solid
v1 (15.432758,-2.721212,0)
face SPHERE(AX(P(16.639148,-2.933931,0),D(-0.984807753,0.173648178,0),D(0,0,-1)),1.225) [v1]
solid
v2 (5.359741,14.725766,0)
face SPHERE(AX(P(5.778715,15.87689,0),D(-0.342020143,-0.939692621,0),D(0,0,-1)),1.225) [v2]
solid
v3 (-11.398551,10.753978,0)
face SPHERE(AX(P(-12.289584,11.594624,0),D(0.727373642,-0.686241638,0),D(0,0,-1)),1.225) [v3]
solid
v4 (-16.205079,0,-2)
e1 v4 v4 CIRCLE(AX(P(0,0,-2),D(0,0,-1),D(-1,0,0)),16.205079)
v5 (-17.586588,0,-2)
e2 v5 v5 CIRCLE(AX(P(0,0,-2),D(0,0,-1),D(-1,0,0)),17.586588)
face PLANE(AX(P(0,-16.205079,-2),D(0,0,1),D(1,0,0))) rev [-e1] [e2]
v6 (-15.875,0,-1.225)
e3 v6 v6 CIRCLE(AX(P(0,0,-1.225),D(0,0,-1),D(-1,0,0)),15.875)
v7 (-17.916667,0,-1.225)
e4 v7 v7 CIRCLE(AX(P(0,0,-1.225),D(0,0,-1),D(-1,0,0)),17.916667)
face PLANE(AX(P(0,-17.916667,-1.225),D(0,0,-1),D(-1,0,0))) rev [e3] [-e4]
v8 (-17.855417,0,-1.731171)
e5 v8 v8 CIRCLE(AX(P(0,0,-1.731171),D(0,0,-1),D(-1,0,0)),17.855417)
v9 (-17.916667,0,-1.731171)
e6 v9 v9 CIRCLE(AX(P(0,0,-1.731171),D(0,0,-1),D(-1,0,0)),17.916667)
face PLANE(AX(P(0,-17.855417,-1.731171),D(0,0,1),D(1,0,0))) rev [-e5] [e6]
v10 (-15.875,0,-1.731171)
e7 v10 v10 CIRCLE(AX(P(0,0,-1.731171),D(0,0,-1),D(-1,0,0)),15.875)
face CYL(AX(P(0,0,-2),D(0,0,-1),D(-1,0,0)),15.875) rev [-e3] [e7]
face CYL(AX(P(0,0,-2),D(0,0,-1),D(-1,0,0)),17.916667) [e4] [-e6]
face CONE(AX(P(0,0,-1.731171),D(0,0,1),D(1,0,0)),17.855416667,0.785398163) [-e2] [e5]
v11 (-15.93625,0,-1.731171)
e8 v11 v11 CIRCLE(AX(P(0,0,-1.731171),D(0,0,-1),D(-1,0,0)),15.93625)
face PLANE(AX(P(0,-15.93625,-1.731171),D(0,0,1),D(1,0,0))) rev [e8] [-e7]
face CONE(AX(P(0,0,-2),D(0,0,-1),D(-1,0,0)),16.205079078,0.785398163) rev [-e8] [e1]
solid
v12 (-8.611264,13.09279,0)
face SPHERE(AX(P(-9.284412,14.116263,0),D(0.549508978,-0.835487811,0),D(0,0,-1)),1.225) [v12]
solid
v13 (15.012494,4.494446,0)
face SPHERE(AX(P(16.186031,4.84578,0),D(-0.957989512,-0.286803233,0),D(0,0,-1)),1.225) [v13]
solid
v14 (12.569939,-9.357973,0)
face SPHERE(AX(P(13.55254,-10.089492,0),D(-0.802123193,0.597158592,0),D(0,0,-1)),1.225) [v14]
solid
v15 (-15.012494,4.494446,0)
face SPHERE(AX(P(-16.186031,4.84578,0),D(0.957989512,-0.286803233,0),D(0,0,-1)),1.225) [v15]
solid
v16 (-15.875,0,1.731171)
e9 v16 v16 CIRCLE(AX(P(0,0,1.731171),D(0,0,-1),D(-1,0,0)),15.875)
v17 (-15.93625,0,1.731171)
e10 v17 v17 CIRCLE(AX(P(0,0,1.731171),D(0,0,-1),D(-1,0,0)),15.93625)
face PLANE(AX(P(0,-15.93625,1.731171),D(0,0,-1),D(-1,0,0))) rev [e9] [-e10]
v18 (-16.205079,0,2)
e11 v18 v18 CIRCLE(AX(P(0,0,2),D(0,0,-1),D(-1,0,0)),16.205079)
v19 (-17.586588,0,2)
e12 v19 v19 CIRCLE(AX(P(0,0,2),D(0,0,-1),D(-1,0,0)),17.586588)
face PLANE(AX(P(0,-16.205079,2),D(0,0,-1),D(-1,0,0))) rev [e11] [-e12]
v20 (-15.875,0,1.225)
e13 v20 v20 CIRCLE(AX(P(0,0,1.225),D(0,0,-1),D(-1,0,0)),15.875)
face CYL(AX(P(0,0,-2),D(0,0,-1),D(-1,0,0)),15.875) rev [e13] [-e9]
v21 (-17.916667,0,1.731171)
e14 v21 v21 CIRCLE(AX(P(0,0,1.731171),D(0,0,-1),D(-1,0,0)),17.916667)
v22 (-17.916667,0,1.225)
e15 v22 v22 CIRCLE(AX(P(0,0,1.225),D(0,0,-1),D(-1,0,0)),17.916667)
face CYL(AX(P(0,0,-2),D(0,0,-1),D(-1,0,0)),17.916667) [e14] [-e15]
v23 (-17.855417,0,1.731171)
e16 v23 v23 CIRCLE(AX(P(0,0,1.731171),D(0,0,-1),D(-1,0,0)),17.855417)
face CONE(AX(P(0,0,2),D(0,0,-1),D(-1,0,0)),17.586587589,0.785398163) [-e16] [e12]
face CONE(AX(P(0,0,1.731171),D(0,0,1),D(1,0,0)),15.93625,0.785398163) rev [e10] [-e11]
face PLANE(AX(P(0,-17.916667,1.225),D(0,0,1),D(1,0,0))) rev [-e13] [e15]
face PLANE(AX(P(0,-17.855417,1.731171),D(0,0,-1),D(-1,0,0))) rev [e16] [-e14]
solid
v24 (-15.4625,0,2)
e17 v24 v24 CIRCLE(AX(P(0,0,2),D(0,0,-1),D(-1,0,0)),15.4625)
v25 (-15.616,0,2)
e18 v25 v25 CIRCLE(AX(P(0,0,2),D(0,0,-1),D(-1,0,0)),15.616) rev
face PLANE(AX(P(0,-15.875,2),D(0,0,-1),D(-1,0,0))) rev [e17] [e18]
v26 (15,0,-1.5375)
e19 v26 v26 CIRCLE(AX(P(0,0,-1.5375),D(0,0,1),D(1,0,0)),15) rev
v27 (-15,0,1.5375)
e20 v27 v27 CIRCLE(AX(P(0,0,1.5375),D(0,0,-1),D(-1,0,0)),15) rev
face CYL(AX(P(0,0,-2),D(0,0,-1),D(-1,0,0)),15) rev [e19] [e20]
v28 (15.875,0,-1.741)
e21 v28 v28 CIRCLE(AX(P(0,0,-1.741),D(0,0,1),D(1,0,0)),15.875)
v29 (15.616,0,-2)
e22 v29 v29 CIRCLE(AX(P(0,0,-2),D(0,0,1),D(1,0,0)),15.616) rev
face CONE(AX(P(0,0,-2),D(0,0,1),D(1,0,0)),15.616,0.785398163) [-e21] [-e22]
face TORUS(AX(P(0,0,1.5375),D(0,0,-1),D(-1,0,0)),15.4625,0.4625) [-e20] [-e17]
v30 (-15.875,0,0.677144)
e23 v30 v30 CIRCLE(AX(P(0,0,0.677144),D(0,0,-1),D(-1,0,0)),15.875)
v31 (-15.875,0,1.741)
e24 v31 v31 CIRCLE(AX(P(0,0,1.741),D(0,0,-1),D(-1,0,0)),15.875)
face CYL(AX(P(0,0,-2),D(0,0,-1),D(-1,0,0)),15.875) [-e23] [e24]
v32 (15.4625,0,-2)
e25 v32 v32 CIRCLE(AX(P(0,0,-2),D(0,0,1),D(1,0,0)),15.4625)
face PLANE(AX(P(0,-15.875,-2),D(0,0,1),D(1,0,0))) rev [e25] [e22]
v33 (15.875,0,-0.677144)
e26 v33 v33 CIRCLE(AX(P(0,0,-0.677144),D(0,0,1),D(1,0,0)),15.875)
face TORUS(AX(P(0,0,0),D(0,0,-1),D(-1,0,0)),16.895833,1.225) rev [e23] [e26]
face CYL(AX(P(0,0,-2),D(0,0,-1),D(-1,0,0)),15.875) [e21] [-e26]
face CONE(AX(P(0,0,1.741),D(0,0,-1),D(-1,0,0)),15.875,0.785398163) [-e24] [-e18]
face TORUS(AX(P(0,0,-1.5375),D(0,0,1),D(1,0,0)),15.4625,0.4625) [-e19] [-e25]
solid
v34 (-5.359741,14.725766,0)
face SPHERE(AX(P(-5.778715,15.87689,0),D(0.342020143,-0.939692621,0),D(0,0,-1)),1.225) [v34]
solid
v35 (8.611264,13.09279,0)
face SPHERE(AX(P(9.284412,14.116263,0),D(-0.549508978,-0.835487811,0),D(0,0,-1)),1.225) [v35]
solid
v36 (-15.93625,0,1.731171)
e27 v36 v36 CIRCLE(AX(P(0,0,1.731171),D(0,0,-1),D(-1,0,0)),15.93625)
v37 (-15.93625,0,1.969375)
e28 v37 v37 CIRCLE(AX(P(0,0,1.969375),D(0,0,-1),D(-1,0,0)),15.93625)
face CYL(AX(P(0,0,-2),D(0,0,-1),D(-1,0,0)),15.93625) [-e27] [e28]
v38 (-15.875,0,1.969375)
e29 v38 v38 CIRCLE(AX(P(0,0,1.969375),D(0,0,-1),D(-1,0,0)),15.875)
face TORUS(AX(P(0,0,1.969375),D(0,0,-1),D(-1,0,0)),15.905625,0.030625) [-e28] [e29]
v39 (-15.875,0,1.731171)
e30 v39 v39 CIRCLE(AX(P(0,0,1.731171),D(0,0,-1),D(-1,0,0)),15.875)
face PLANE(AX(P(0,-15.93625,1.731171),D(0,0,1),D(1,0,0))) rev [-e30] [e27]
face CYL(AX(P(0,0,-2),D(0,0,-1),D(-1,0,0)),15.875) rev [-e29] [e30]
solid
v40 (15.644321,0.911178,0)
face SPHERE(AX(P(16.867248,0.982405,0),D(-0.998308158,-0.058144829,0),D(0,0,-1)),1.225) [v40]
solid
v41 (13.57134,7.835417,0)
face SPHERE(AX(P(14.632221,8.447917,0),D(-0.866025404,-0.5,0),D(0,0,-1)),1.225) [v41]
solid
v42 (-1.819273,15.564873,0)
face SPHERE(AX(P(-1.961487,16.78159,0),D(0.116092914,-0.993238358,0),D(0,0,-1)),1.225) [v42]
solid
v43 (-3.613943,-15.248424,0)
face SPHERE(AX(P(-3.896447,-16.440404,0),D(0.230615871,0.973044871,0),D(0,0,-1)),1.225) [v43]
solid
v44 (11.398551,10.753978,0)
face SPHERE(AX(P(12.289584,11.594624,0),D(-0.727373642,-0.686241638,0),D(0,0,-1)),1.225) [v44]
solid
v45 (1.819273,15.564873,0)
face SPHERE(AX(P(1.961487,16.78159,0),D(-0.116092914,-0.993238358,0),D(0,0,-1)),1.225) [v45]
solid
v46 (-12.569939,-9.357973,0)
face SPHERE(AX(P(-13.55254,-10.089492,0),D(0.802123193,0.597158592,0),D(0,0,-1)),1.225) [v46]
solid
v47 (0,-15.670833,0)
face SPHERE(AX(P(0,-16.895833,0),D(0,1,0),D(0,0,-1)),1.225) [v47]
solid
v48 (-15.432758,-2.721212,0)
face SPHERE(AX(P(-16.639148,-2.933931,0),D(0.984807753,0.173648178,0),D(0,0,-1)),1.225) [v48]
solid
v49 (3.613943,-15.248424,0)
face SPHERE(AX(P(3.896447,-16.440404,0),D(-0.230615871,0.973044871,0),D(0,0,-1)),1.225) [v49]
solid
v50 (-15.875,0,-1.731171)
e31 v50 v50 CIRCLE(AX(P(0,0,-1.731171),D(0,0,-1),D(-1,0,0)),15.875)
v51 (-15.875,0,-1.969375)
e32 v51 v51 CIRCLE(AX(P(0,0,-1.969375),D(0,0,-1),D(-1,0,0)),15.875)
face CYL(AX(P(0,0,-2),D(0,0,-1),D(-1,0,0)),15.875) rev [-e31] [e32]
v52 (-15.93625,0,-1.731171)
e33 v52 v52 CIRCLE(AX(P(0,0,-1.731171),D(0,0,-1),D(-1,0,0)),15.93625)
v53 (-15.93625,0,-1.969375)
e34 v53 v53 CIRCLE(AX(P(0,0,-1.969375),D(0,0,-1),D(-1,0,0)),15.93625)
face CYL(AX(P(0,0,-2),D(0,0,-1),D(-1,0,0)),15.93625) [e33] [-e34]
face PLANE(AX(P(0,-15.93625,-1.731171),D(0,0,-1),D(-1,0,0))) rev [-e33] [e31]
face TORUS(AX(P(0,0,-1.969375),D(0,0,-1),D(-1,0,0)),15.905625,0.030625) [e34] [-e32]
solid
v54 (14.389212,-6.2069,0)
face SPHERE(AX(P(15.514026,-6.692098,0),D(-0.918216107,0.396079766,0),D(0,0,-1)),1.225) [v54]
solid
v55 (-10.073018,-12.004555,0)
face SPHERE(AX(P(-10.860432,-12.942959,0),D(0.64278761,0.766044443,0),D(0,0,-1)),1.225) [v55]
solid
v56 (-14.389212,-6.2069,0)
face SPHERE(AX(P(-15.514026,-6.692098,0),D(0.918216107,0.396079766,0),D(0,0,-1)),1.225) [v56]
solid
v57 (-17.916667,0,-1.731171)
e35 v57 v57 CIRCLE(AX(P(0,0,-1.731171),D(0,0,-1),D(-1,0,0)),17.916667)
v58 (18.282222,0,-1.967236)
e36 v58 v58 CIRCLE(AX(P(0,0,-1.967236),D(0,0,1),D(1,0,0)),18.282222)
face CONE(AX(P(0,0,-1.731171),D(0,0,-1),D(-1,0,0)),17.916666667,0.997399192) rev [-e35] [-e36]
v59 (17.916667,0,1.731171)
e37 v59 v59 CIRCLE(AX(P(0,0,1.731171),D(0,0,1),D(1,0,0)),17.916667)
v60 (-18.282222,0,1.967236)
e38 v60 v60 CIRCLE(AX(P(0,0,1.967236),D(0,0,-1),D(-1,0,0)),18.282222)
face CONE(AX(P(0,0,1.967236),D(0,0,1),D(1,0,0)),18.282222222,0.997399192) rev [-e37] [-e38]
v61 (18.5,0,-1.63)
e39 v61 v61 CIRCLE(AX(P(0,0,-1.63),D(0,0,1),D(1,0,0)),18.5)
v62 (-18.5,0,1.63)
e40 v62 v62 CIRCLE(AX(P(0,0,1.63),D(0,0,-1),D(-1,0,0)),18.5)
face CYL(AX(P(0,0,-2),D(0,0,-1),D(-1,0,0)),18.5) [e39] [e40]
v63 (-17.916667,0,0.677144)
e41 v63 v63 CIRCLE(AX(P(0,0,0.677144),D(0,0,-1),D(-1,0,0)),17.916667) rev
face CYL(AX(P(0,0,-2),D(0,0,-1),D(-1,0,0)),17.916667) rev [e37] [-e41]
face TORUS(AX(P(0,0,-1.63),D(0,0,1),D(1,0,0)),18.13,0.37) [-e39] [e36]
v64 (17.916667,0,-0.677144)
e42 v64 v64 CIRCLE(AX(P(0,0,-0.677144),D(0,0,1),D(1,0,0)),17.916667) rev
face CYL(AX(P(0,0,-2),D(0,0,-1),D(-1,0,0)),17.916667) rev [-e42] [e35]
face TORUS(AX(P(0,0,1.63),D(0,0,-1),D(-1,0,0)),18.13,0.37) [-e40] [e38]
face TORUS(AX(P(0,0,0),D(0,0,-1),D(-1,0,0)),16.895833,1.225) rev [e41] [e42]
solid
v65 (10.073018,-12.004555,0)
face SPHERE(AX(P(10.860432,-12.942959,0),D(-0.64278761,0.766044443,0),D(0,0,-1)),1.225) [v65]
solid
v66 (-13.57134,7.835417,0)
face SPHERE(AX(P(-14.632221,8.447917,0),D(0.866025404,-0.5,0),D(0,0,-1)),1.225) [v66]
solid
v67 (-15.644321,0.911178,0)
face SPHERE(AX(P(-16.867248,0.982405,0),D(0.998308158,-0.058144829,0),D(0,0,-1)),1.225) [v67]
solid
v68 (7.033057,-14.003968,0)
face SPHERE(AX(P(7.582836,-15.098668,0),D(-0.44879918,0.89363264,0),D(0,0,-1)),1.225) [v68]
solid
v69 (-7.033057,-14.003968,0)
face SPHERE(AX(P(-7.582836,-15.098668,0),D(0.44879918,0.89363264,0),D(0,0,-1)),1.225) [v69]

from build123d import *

# Parameters (mm, degrees)
SKETCH3_W         = 4
SKETCH3_H         = 0.583333333
SKETCH3_H_2       = 0.875
SKETCH4_R         = 1.225
CIRPATTERN1_COUNT = 27
FILLET1_R         = 0.37
FILLET2_R         = 0.4625
CHAMFER2_SIZE     = 0.259


with BuildPart() as part:
    # Sketch3 → Revolve1 (revolve)
    with BuildSketch(Plane(origin=(0, 0, 0), x_dir=(0, 0, -1), z_dir=(1, 0, 0)), mode=Mode.PRIVATE) as revolve1_sk:
        with Locations((0, -18.208333334)):
            Rectangle(SKETCH3_W, SKETCH3_H)
        with Locations((0, -15.4375)):
            Rectangle(SKETCH3_W, SKETCH3_H_2)
    revolve(revolve1_sk.sketch.rotate(Axis((0, 0, -2), (0, 0, 1)), 270), axis=Axis((0, 0, -2), (0, 0, 1)))

    # Sketch4 → Cut-Revolve1 (revolve, cut)
    with BuildSketch(Plane(origin=(0, 0, 0), x_dir=(0, 0, -1), z_dir=(1, 0, 0)), mode=Mode.PRIVATE) as cut_revolve1_sk:
        with Locations((0, -16.895833333)):
            Circle(SKETCH4_R)
    revolve(cut_revolve1_sk.sketch.rotate(Axis((0, 0, -2), (0, 0, 1)), 270), axis=Axis((0, 0, -2), (0, 0, 1)), mode=Mode.SUBTRACT)

    # Fillet1
    fillet1_edges = [part.edges().sort_by_distance(p)[0] for p in [
        (18.5, 0, -2),
        (18.5, 0, 2),
    ]]
    fillet(fillet1_edges, radius=FILLET1_R)

    # Fillet2
    fillet2_edges = [part.edges().sort_by_distance(p)[0] for p in [
        (15, 0, -2),
        (15, 0, 2),
    ]]
    fillet(fillet2_edges, radius=FILLET2_R)

    # Chamfer1: read off the stored shape, not the designer's step
    # Chamfer1 outline → Chamfer1 (revolve, cut)
    with BuildSketch(Plane.XZ):
        Polygon((17.916666667, -1.731170922), (17.916666667, -2), (18.282222222, -2), (18.282222222, -1.967236408), align=None)
        Polygon((17.916666667, 1.731170922), (18.282222222, 1.967236408), (18.282222222, 2), (17.916666667, 2), align=None)
    revolve(axis=Axis((0, 0, 0), (0, 0, 1)), mode=Mode.SUBTRACT)

    # Chamfer2
    chamfer2_edges = [part.edges().sort_by_distance(p)[0] for p in [
        (15.875, 0, 2),
        (15.875, 0, -2),
    ]]
    chamfer(chamfer2_edges, length=CHAMFER2_SIZE)


with BuildPart() as body_2:
    # Sketch5 → Revolve2 (revolve)
    with BuildSketch(Plane(origin=(0, 0, 0), x_dir=(0, 0, -1), z_dir=(1, 0, 0))):
        with BuildLine():
            Line((0, -15.670833333), (0, -18.120833333))
            ThreePointArc((0, -18.120833333), (1.225, -16.895833333), (0, -15.670833333))
        make_face()
    revolve(axis=Axis((0, -15.670833333, 0), (0, -1, 0)))


with BuildPart() as cirpattern1_1:
    # CirPattern1: pattern copy
    add(body_2.part.rotate(Axis((0, 0, 0), (0, 0, 1)), 1 * 360 / CIRPATTERN1_COUNT))


with BuildPart() as cirpattern1_2:
    # CirPattern1: pattern copy
    add(body_2.part.rotate(Axis((0, 0, 0), (0, 0, 1)), 2 * 360 / CIRPATTERN1_COUNT))


with BuildPart() as cirpattern1_3:
    # CirPattern1: pattern copy
    add(body_2.part.rotate(Axis((0, 0, 0), (0, 0, 1)), 3 * 360 / CIRPATTERN1_COUNT))


with BuildPart() as cirpattern1_4:
    # CirPattern1: pattern copy
    add(body_2.part.rotate(Axis((0, 0, 0), (0, 0, 1)), 4 * 360 / CIRPATTERN1_COUNT))


with BuildPart() as cirpattern1_5:
    # CirPattern1: pattern copy
    add(body_2.part.rotate(Axis((0, 0, 0), (0, 0, 1)), 5 * 360 / CIRPATTERN1_COUNT))


with BuildPart() as cirpattern1_6:
    # CirPattern1: pattern copy
    add(body_2.part.rotate(Axis((0, 0, 0), (0, 0, 1)), 6 * 360 / CIRPATTERN1_COUNT))


with BuildPart() as cirpattern1_7:
    # CirPattern1: pattern copy
    add(body_2.part.rotate(Axis((0, 0, 0), (0, 0, 1)), 7 * 360 / CIRPATTERN1_COUNT))


with BuildPart() as cirpattern1_8:
    # CirPattern1: pattern copy
    add(body_2.part.rotate(Axis((0, 0, 0), (0, 0, 1)), 8 * 360 / CIRPATTERN1_COUNT))


with BuildPart() as cirpattern1_9:
    # CirPattern1: pattern copy
    add(body_2.part.rotate(Axis((0, 0, 0), (0, 0, 1)), 9 * 360 / CIRPATTERN1_COUNT))


with BuildPart() as cirpattern1_10:
    # CirPattern1: pattern copy
    add(body_2.part.rotate(Axis((0, 0, 0), (0, 0, 1)), 10 * 360 / CIRPATTERN1_COUNT))


with BuildPart() as cirpattern1_11:
    # CirPattern1: pattern copy
    add(body_2.part.rotate(Axis((0, 0, 0), (0, 0, 1)), 11 * 360 / CIRPATTERN1_COUNT))


with BuildPart() as cirpattern1_12:
    # CirPattern1: pattern copy
    add(body_2.part.rotate(Axis((0, 0, 0), (0, 0, 1)), 12 * 360 / CIRPATTERN1_COUNT))


with BuildPart() as cirpattern1_13:
    # CirPattern1: pattern copy
    add(body_2.part.rotate(Axis((0, 0, 0), (0, 0, 1)), 13 * 360 / CIRPATTERN1_COUNT))


with BuildPart() as cirpattern1_14:
    # CirPattern1: pattern copy
    add(body_2.part.rotate(Axis((0, 0, 0), (0, 0, 1)), 14 * 360 / CIRPATTERN1_COUNT))


with BuildPart() as cirpattern1_15:
    # CirPattern1: pattern copy
    add(body_2.part.rotate(Axis((0, 0, 0), (0, 0, 1)), 15 * 360 / CIRPATTERN1_COUNT))


with BuildPart() as cirpattern1_16:
    # CirPattern1: pattern copy
    add(body_2.part.rotate(Axis((0, 0, 0), (0, 0, 1)), 16 * 360 / CIRPATTERN1_COUNT))


with BuildPart() as cirpattern1_17:
    # CirPattern1: pattern copy
    add(body_2.part.rotate(Axis((0, 0, 0), (0, 0, 1)), 17 * 360 / CIRPATTERN1_COUNT))


with BuildPart() as cirpattern1_18:
    # CirPattern1: pattern copy
    add(body_2.part.rotate(Axis((0, 0, 0), (0, 0, 1)), 18 * 360 / CIRPATTERN1_COUNT))


with BuildPart() as cirpattern1_19:
    # CirPattern1: pattern copy
    add(body_2.part.rotate(Axis((0, 0, 0), (0, 0, 1)), 19 * 360 / CIRPATTERN1_COUNT))


with BuildPart() as cirpattern1_20:
    # CirPattern1: pattern copy
    add(body_2.part.rotate(Axis((0, 0, 0), (0, 0, 1)), 20 * 360 / CIRPATTERN1_COUNT))


with BuildPart() as cirpattern1_21:
    # CirPattern1: pattern copy
    add(body_2.part.rotate(Axis((0, 0, 0), (0, 0, 1)), 21 * 360 / CIRPATTERN1_COUNT))


with BuildPart() as cirpattern1_22:
    # CirPattern1: pattern copy
    add(body_2.part.rotate(Axis((0, 0, 0), (0, 0, 1)), 22 * 360 / CIRPATTERN1_COUNT))


with BuildPart() as cirpattern1_23:
    # CirPattern1: pattern copy
    add(body_2.part.rotate(Axis((0, 0, 0), (0, 0, 1)), 23 * 360 / CIRPATTERN1_COUNT))


with BuildPart() as cirpattern1_24:
    # CirPattern1: pattern copy
    add(body_2.part.rotate(Axis((0, 0, 0), (0, 0, 1)), 24 * 360 / CIRPATTERN1_COUNT))


with BuildPart() as cirpattern1_25:
    # CirPattern1: pattern copy
    add(body_2.part.rotate(Axis((0, 0, 0), (0, 0, 1)), 25 * 360 / CIRPATTERN1_COUNT))


with BuildPart() as cirpattern1_26:
    # CirPattern1: pattern copy
    add(body_2.part.rotate(Axis((0, 0, 0), (0, 0, 1)), 26 * 360 / CIRPATTERN1_COUNT))


with BuildPart() as body_29:
    # Sketch6 → Revolve3 (revolve)
    with BuildSketch(Plane(origin=(0, 0, 0), x_dir=(0, 0, -1), z_dir=(1, 0, 0)), mode=Mode.PRIVATE) as revolve3_sk:
        Polygon((-2, -16.205079078), (-2, -17.586587589), (-1.731170922, -17.855416667), (-1.731170922, -17.916666667), (-1.225, -17.916666667), (-1.225, -15.875), (-1.731170922, -15.875), (-1.731170922, -15.93625), align=None)
        Polygon((1.731170922, -17.916666667), (1.225, -17.916666667), (1.225, -15.875), (1.731170922, -15.875), (1.731170922, -15.93625), (2, -16.205079078), (2, -17.586587589), (1.731170922, -17.855416667), align=None)
    revolve(revolve3_sk.sketch.rotate(Axis((0, 0, -2), (0, 0, 1)), 270), axis=Axis((0, 0, -2), (0, 0, 1)))


with BuildPart() as body_30:
    # Sketch7 → Revolve4 (revolve)
    with BuildSketch(Plane(origin=(0, 0, 0), x_dir=(0, 0, -1), z_dir=(1, 0, 0)), mode=Mode.PRIVATE) as revolve4_sk:
        with BuildLine():
            Line((-1.731170922, -15.93625), (-1.731170922, -15.875))
            Line((-1.731170922, -15.875), (-1.969375, -15.875))
            ThreePointArc((-1.969375, -15.875), (-2, -15.905625), (-1.969375, -15.93625))
            Line((-1.969375, -15.93625), (-1.731170922, -15.93625))
        make_face()
        with BuildLine():
            Line((1.731170922, -15.875), (1.969375, -15.875))
            ThreePointArc((1.969375, -15.875), (2, -15.905625), (1.969375, -15.93625))
            Line((1.969375, -15.93625), (1.731170922, -15.93625))
            Line((1.731170922, -15.93625), (1.731170922, -15.875))
        make_face()
    revolve(revolve4_sk.sketch.rotate(Axis((0, 0, -2), (0, 0, 1)), 270), axis=Axis((0, 0, -2), (0, 0, 1)))


solid = Compound([part.part, body_2.part, cirpattern1_1.part, cirpattern1_2.part, cirpattern1_3.part, cirpattern1_4.part, cirpattern1_5.part, cirpattern1_6.part, cirpattern1_7.part, cirpattern1_8.part, cirpattern1_9.part, cirpattern1_10.part, cirpattern1_11.part, cirpattern1_12.part, cirpattern1_13.part, cirpattern1_14.part, cirpattern1_15.part, cirpattern1_16.part, cirpattern1_17.part, cirpattern1_18.part, cirpattern1_19.part, cirpattern1_20.part, cirpattern1_21.part, cirpattern1_22.part, cirpattern1_23.part, cirpattern1_24.part, cirpattern1_25.part, cirpattern1_26.part, body_29.part, body_30.part])
